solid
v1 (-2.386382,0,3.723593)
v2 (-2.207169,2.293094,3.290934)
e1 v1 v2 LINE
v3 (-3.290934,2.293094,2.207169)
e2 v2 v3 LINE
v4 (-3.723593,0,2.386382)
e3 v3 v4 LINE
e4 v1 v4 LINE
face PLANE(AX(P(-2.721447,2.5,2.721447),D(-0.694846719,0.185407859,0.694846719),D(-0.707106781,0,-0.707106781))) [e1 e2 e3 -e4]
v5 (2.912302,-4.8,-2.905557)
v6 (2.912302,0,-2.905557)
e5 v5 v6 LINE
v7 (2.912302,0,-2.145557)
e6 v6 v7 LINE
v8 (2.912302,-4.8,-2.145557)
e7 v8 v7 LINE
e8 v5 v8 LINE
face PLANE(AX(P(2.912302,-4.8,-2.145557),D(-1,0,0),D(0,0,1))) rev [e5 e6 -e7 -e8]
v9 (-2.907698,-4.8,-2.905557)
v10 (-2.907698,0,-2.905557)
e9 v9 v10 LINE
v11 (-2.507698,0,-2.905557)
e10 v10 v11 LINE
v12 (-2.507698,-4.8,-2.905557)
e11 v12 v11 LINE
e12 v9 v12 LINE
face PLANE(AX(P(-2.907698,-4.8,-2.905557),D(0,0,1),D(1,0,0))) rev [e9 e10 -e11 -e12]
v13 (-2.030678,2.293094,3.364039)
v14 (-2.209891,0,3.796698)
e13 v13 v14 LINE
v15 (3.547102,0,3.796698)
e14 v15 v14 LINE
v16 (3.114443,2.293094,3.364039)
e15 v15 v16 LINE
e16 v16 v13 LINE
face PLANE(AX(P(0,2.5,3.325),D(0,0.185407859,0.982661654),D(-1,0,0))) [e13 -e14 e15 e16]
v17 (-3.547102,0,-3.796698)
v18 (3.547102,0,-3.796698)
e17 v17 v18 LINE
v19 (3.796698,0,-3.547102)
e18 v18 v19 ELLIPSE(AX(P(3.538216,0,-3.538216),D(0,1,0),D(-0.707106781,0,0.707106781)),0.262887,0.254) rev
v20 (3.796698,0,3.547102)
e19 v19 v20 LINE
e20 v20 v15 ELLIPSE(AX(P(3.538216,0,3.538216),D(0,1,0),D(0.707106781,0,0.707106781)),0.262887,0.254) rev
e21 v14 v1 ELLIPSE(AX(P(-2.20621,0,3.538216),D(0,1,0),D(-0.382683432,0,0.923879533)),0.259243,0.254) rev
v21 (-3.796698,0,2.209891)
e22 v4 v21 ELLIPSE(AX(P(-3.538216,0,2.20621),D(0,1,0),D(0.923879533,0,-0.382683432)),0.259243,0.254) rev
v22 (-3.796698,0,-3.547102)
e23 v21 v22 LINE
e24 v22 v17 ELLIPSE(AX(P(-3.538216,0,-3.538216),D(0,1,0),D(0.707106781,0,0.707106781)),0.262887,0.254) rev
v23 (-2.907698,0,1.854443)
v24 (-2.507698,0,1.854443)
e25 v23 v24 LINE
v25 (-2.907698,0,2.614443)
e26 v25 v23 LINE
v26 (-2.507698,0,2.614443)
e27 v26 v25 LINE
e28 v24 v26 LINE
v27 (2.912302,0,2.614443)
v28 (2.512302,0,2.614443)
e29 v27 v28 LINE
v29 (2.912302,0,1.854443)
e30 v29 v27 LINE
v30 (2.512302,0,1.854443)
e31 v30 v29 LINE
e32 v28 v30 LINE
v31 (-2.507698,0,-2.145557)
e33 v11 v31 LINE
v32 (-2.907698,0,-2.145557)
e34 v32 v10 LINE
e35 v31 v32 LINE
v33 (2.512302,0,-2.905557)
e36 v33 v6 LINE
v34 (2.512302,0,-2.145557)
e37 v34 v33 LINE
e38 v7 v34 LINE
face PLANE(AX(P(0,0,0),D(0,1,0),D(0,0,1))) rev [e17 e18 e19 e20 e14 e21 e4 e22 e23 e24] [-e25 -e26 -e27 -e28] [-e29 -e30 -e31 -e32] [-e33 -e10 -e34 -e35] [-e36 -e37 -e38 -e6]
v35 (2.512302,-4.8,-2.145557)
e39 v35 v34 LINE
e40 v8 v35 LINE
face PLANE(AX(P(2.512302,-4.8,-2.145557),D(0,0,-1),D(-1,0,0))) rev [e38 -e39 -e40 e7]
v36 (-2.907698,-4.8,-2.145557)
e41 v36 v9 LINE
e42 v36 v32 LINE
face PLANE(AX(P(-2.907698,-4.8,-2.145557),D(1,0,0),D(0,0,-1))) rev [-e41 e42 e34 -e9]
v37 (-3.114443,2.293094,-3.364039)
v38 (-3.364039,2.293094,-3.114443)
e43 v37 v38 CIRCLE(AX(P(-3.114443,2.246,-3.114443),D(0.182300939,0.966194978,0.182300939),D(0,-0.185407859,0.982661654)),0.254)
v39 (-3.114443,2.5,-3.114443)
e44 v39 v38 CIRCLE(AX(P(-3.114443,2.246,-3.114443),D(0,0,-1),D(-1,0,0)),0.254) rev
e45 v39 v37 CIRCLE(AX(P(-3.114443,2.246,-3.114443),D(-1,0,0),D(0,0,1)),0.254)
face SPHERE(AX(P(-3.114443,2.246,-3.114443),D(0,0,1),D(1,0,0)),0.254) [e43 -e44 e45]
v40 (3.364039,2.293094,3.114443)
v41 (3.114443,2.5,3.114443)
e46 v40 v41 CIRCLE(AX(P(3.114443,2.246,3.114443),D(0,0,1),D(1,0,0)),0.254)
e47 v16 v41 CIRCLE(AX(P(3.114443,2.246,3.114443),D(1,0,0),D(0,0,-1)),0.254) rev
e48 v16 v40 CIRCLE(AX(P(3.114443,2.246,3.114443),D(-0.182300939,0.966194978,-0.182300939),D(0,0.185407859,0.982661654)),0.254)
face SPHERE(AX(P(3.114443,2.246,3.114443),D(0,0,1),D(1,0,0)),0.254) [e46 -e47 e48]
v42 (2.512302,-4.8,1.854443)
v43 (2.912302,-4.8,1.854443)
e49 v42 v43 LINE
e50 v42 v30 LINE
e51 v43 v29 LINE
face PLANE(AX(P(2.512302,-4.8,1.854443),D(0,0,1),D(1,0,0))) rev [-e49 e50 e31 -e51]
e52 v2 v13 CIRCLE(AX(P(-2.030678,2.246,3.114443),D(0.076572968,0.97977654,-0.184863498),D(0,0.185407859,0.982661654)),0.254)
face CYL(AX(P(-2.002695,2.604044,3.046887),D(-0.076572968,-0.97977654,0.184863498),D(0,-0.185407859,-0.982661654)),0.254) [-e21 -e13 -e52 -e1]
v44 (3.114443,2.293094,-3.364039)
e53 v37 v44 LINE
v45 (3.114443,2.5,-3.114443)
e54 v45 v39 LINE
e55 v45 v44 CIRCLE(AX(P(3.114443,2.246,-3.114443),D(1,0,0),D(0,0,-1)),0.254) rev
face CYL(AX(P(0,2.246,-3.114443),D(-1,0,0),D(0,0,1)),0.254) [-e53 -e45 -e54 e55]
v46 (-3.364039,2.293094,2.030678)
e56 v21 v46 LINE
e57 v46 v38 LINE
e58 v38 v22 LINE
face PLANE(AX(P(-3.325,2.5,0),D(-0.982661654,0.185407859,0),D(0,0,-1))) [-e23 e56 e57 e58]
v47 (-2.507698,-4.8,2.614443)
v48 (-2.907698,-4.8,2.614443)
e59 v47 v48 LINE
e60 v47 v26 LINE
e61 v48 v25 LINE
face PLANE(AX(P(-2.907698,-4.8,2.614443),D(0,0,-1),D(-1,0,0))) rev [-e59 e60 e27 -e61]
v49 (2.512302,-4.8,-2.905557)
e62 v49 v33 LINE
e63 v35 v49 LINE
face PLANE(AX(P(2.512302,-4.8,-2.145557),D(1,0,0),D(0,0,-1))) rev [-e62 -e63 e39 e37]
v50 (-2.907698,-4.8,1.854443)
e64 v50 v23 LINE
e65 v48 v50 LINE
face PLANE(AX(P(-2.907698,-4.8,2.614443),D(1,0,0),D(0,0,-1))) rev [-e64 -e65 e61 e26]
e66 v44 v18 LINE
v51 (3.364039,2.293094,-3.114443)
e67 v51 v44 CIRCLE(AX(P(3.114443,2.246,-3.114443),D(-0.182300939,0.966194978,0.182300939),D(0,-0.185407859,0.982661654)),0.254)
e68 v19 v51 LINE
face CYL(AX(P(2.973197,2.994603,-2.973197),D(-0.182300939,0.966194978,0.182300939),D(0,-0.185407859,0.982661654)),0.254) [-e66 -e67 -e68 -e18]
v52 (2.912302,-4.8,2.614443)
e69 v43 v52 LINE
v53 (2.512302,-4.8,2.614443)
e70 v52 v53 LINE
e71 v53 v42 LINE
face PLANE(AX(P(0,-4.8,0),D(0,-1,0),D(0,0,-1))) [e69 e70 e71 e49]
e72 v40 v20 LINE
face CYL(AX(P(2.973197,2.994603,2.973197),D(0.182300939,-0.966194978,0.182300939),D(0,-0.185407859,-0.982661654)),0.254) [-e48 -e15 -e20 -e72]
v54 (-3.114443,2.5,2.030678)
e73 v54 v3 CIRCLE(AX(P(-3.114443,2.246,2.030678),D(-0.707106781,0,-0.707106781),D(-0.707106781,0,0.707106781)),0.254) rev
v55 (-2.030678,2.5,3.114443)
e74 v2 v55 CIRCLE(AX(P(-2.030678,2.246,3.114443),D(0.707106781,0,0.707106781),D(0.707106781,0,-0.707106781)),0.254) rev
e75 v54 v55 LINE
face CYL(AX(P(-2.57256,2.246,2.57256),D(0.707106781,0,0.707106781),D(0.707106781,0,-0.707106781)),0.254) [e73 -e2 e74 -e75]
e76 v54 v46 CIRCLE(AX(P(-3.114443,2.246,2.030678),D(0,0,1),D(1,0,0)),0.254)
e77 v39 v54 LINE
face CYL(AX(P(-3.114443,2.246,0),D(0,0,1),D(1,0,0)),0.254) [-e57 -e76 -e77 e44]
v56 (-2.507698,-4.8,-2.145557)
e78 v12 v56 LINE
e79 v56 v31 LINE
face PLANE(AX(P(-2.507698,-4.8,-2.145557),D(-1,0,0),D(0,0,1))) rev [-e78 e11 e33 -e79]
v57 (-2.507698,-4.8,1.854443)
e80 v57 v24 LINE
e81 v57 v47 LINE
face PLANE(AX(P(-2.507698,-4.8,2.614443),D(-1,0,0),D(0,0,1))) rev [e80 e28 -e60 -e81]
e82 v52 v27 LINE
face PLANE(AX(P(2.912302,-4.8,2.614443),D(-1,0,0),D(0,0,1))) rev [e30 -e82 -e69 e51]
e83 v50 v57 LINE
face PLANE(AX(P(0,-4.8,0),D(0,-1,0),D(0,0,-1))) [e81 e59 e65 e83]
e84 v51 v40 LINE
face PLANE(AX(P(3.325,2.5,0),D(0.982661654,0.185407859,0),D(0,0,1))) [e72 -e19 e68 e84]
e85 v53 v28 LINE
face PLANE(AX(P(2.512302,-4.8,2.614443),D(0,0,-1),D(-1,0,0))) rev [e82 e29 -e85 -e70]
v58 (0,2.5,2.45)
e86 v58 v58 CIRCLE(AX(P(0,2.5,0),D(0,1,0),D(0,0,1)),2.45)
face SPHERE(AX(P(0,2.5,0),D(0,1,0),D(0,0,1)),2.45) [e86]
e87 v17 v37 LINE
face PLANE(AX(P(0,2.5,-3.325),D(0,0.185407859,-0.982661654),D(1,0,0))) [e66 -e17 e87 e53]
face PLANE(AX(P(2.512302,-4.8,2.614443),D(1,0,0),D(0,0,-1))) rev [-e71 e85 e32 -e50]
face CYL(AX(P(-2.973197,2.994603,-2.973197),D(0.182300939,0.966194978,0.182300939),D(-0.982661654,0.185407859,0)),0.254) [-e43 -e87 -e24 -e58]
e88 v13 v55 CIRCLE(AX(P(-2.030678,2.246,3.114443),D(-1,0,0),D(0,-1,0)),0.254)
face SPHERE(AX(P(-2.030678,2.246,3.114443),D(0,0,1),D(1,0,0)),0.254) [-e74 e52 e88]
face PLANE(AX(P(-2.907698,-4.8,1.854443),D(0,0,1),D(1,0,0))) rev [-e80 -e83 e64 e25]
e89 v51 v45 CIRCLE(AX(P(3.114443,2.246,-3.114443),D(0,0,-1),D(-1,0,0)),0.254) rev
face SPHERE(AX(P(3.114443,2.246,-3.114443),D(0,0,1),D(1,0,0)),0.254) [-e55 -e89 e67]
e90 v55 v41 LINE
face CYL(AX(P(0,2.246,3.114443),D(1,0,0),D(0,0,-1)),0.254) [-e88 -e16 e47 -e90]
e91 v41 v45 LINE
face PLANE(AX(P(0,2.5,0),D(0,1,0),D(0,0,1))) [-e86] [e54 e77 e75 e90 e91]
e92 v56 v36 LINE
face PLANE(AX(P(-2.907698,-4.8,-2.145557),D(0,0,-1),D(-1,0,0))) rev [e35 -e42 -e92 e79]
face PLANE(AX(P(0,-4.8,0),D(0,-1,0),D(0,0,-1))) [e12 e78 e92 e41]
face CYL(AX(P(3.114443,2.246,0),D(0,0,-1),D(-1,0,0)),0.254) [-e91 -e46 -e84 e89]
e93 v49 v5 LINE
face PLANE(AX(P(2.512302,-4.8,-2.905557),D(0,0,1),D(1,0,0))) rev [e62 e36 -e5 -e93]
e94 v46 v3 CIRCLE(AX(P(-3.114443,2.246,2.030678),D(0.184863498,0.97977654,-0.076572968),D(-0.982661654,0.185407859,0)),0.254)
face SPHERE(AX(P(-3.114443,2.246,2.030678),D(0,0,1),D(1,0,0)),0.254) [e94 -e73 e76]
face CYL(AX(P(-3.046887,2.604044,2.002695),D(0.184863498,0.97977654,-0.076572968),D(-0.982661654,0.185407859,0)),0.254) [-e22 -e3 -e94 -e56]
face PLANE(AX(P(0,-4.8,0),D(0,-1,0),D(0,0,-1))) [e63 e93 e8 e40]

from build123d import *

# Parameters (mm, degrees)
BOSS_EXTRUDE1_DEPTH      = 2.5
CHAMFER1_SIZE            = 2.65
CHAMFER1_SIZE_2          = 0.5
FILLET1_R                = 0.254
REVOLVE1_ANGLE           = 180
REVOLVE1_OTHER_WAY_ANGLE = 180
SKETCH3_W                = 0.4
SKETCH3_H                = 0.76
BOSS_EXTRUDE2_DEPTH      = 4.8


with BuildPart() as part:
    # Sketch1 → Boss-Extrude1 (new body)
    with BuildSketch(Plane(origin=(0, 0, 0), x_dir=(1, 0, 0), z_dir=(0, 1, 0))):
        Polygon((-3.825, -2.325), (-2.325, -3.825), (3.825, -3.825), (3.825, 3.825), (-3.825, 3.825), align=None)
    extrude(amount=BOSS_EXTRUDE1_DEPTH)

    # Chamfer1
    # the kernel refuses this chamfer: 2.65, 0.5 mm, written as the material it takes off along each edge
    with BuildSketch(Plane(origin=(3.825, 2.5, 10.710580639), x_dir=(0.007135648431947453, -0.9999745409366458, 0), z_dir=(0, 0, -1)), Plane(origin=(10.710580639, 2.5, -3.825), x_dir=(0, -0.9999745409366458, -0.007135648431947453), z_dir=(-1, 0, 0))) as chamfer1_piece_1:
        Polygon((CHAMFER1_SIZE * 0.999974540937, CHAMFER1_SIZE * 0.00713564843195), (-CHAMFER1_SIZE_2 * 0.00713564843195, CHAMFER1_SIZE_2 * 0.999974540937), (0, 0), align=None)
    extrude(amount=21.421161277, mode=Mode.SUBTRACT)
    with BuildSketch(Plane(origin=(-3.825, 2.5, -10.710580639), x_dir=(-0.007135648431947453, -0.9999745409366458, 0), z_dir=(0, 0, 1)), Plane(origin=(-9.210580639, 2.5, 3.825), x_dir=(0, -0.9999745409366458, 0.007135648431947453), z_dir=(1, 0, 0))) as chamfer1_piece_2:
        Polygon((CHAMFER1_SIZE * 0.999974540937, CHAMFER1_SIZE * 0.00713564843195), (-CHAMFER1_SIZE_2 * 0.00713564843195, CHAMFER1_SIZE_2 * 0.999974540937), (0, 0), align=None)
    extrude(amount=19.921161277, mode=Mode.SUBTRACT)
    with BuildSketch(Plane(origin=(-8.693840762, 2.5, -2.543840762), x_dir=(-0.0050456653943929935, -0.9999745409366458, 0.005045665394392992), z_dir=(0.7071067811865475, 0, 0.7071067811865476))) as chamfer1_piece_3:
        Polygon((CHAMFER1_SIZE * 0.999974540937, CHAMFER1_SIZE * 0.00713564843195), (-CHAMFER1_SIZE_2 * 0.00713564843195, CHAMFER1_SIZE_2 * 0.999974540937), (0, 0), align=None)
    extrude(amount=15.892481621, mode=Mode.SUBTRACT)

    # Fillet1
    fillet1_edges = [part.edges().sort_by_distance(p)[0] for p in [
        (0.603553391, 2.5, 3.325),
        (-2.721446609, 2.5, 2.721446609),
        (-3.325, 2.5, -0.603553391),
        (0, 2.5, -3.325),
        (3.325, 2.5, 0),
        (-3.560849057, 1.25, 2.215585097),
        (-2.215585097, 1.25, 3.560849057),
        (-3.560849057, 1.25, -3.560849057),
        (3.560849057, 1.25, 3.560849057),
        (3.560849057, 1.25, -3.560849057),
    ]]
    fillet(fillet1_edges, radius=FILLET1_R)

    # Sketch2 → Revolve1 (revolve)
    with BuildSketch(Plane(origin=(0, 2.5, 0), x_dir=(1, 0, 0), z_dir=(0, 1, 0))):
        with BuildLine():
            Line((0, -2.45), (0, 2.45))
            ThreePointArc((0, 2.45), (2.45, 0), (0, -2.45))
        make_face()
    revolve(axis=Axis((0, 2.5, 2.45), (0, 0, -1)), revolution_arc=REVOLVE1_ANGLE)

    # Sketch2 → Revolve1 other way (revolve)
    with BuildSketch(Plane(origin=(0, 2.5, 0), x_dir=(1, 0, 0), z_dir=(0, 1, 0))):
        with BuildLine():
            Line((0, -2.45), (0, 2.45))
            ThreePointArc((0, 2.45), (2.45, 0), (0, -2.45))
        make_face()
    revolve(axis=Axis((0, 2.5, 2.45), (0, 0, 1)), revolution_arc=REVOLVE1_OTHER_WAY_ANGLE)

    # Sketch3 → Boss-Extrude2 (add)
    with BuildSketch(Plane.XZ):
        with Locations((-2.707698113, 2.234442884)):
            Rectangle(SKETCH3_W, SKETCH3_H)
        with Locations((-2.707698113, -2.525557116)):
            Rectangle(SKETCH3_W, SKETCH3_H)
        with Locations((2.712301887, -2.525557116)):
            Rectangle(SKETCH3_W, SKETCH3_H)
        with Locations((2.712301887, 2.234442884)):
            Rectangle(SKETCH3_W, SKETCH3_H)
    extrude(amount=BOSS_EXTRUDE2_DEPTH)


solid = part.part
